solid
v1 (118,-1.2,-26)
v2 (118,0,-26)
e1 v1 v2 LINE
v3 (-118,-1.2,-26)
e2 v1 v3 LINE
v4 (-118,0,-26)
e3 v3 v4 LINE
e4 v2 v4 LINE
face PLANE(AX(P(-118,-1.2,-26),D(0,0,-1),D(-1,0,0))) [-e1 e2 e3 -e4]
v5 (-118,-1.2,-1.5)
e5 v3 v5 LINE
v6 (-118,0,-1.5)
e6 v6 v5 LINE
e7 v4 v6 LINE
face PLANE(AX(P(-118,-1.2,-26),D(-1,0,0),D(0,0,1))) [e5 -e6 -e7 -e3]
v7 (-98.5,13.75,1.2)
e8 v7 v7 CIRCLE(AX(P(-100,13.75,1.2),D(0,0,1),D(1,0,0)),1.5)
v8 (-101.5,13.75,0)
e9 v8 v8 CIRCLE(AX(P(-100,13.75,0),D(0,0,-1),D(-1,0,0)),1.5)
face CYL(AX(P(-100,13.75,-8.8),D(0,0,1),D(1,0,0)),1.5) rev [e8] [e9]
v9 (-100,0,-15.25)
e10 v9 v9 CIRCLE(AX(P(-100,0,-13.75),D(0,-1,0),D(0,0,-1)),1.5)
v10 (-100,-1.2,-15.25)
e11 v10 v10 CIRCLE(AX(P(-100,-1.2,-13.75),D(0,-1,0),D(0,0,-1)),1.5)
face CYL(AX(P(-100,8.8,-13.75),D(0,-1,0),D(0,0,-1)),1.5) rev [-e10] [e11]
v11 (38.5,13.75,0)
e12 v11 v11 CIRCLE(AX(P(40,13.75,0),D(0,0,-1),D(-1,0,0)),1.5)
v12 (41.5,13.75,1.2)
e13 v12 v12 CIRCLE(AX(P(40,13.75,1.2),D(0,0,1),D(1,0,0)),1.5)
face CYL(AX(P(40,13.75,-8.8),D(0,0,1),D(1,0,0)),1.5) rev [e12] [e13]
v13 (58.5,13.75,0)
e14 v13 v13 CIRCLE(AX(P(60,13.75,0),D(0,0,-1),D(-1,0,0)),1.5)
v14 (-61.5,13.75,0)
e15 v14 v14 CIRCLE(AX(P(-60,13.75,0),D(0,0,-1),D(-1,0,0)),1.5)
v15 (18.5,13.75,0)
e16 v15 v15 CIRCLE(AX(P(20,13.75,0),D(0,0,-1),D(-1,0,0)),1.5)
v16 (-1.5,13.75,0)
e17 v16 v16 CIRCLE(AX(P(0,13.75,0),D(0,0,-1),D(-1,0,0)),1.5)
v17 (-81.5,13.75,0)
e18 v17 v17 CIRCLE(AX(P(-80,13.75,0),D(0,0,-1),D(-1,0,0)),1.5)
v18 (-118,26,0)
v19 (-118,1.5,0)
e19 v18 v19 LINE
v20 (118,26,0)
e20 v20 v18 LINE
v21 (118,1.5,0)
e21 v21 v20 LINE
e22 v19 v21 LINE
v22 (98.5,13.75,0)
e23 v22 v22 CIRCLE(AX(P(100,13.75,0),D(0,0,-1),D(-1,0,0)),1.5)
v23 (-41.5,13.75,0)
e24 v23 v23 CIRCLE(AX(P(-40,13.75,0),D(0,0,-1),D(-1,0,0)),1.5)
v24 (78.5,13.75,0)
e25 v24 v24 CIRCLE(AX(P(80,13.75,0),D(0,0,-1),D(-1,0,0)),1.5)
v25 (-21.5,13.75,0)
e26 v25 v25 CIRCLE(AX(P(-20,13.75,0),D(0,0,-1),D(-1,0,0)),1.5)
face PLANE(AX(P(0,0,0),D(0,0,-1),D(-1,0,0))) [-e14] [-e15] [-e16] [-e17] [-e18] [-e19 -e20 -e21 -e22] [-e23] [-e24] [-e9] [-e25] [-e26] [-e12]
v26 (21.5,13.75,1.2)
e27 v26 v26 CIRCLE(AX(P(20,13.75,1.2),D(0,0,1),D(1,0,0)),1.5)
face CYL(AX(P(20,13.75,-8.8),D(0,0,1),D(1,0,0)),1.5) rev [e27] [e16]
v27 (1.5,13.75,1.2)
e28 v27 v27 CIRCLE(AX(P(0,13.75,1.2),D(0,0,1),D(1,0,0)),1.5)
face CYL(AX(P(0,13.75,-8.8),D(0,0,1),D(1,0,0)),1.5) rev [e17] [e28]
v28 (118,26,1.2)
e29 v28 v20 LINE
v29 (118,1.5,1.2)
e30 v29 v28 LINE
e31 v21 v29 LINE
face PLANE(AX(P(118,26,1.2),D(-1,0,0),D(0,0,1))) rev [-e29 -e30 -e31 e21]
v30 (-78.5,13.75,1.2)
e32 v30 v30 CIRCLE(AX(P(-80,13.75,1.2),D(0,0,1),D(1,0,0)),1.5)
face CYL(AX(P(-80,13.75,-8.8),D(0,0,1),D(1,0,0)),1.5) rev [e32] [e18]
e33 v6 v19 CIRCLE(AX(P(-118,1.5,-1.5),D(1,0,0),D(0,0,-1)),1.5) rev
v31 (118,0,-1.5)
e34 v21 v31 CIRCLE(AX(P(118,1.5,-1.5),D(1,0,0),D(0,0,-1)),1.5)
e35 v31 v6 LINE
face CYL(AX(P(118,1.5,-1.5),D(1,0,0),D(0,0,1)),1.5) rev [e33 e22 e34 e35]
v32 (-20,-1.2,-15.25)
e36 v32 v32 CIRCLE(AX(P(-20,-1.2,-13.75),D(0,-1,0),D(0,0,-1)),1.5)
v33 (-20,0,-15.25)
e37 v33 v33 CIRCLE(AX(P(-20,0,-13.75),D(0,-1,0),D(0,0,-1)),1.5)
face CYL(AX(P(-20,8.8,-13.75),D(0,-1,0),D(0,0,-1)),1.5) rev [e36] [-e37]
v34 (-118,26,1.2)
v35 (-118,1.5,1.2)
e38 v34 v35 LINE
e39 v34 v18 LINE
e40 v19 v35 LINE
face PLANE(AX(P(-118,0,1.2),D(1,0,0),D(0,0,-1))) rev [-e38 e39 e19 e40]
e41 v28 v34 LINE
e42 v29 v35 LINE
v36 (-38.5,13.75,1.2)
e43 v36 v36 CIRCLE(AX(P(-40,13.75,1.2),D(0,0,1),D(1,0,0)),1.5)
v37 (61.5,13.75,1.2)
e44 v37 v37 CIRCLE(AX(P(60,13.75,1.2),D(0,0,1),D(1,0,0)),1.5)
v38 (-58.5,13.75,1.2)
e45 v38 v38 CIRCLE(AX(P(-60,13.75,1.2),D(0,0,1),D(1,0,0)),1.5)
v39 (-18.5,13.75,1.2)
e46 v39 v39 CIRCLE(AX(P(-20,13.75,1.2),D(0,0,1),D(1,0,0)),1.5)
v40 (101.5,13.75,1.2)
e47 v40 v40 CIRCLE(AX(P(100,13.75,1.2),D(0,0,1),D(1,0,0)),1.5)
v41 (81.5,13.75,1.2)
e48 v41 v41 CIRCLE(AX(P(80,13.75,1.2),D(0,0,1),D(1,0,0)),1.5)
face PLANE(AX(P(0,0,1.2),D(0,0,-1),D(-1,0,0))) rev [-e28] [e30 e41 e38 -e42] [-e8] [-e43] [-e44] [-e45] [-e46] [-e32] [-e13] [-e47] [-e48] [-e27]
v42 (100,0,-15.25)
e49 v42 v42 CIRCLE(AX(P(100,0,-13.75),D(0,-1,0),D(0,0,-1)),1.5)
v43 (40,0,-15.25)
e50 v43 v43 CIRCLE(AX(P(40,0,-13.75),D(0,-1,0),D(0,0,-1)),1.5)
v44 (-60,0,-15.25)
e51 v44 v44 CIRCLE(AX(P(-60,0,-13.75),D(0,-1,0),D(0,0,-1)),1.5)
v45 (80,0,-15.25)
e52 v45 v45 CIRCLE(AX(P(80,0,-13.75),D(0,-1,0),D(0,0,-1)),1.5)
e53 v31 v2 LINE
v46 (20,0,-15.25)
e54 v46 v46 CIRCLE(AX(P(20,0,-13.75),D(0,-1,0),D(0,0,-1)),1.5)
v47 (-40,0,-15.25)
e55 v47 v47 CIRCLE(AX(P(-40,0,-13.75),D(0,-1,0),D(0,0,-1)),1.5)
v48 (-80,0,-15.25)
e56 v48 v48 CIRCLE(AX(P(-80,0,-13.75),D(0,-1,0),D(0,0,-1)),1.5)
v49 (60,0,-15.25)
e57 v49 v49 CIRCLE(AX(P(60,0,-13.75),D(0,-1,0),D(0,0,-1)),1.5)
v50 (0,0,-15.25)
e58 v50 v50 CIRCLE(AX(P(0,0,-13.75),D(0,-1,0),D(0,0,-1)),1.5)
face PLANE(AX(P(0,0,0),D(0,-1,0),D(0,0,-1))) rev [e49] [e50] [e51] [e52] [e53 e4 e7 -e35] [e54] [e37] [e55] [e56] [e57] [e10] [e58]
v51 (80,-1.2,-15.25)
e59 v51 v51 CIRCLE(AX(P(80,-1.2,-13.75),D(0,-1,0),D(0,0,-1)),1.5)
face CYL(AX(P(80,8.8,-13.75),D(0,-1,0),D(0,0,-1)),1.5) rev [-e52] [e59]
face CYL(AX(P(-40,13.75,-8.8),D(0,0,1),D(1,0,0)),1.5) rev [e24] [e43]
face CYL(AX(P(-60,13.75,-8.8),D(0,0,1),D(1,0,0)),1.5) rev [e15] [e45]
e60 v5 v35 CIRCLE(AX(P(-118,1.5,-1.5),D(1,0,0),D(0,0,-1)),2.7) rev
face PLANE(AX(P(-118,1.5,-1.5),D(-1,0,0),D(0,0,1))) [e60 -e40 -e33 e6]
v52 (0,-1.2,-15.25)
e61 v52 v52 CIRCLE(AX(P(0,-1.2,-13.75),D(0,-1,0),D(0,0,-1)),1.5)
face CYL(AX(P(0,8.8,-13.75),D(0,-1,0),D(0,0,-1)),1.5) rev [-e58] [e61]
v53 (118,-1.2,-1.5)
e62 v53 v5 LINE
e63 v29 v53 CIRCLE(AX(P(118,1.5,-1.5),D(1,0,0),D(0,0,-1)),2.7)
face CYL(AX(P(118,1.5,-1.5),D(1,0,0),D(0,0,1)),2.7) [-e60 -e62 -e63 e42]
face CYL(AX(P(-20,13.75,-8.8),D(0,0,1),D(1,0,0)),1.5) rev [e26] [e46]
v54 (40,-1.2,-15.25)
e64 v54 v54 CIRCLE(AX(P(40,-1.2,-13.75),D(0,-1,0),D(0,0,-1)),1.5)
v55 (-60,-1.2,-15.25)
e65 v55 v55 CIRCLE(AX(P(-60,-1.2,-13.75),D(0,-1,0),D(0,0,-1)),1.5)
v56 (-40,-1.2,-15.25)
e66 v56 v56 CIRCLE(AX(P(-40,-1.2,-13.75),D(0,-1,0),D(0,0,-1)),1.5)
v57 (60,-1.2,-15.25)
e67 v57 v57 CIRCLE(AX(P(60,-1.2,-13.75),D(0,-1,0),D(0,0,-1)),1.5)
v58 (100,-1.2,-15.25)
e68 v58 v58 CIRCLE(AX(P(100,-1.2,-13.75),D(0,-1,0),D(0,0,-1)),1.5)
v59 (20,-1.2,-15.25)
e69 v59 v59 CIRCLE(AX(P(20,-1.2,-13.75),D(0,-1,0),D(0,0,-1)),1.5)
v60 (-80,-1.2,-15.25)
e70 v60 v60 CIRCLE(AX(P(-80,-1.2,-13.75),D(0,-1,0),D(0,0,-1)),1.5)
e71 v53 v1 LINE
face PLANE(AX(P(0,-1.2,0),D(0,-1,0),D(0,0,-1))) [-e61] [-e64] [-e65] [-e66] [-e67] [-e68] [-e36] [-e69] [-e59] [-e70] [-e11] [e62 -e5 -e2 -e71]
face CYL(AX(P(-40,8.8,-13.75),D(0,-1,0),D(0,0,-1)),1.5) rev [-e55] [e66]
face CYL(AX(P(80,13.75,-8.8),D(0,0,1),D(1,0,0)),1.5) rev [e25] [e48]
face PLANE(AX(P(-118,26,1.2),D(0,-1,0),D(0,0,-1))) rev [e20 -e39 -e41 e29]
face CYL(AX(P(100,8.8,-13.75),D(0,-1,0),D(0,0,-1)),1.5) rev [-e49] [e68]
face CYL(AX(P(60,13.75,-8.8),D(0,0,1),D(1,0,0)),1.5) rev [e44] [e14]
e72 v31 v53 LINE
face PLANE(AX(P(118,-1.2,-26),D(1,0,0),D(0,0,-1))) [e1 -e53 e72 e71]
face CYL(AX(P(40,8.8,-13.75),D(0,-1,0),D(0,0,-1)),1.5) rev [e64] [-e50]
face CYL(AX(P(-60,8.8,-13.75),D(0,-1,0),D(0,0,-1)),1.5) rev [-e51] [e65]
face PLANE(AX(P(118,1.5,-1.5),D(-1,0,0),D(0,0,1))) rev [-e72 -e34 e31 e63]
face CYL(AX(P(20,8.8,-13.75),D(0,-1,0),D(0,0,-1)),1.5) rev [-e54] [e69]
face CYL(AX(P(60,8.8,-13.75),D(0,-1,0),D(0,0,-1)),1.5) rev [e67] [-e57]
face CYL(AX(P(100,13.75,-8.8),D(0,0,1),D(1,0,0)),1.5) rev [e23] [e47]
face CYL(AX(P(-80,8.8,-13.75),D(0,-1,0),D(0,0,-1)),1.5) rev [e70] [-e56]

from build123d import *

# Parameters (mm, degrees)
SKETCH1_W                    = 236
SKETCH1_H                    = 26
BASE_FLANGE1_DEPTH           = 1.2
EDGE_FLANGE1_STRIP_W         = 7.8
EDGE_FLANGE1_STRIP_H         = 1.2
EDGE_FLANGE1_STRIP_CUT_DEPTH = 236
EDGE_FLANGE1_DEPTH           = 236
SKETCH9_R                    = 1.5
CUT_EXTRUDE1_DEPTH           = 10
SKETCH10_R                   = 1.5
CUT_EXTRUDE2_DEPTH           = 10


# Sheet-metal steps are written as plain solids
with BuildPart() as part:
    # Sketch1 → Base-Flange1 (new body)
    with BuildSketch(Plane(origin=(0, 0, 0), x_dir=(1, 0, 0), z_dir=(0, 1, 0))):
        with Locations((0, 13)):
            Rectangle(SKETCH1_W, SKETCH1_H)
    extrude(amount=-BASE_FLANGE1_DEPTH)

    # Edge-Flange1 strip (across the edge) → Edge-Flange1 strip cut (cut)
    with BuildSketch(Plane(origin=(-118, 0, 0), x_dir=(0, 0, -1), z_dir=(1, 0, 0))):
        with Locations((-2.4, -0.6)):
            Rectangle(EDGE_FLANGE1_STRIP_W, EDGE_FLANGE1_STRIP_H)
    extrude(amount=EDGE_FLANGE1_STRIP_CUT_DEPTH, mode=Mode.SUBTRACT)

    # Edge-Flange1 section (across the edge) → Edge-Flange1 (add)
    with BuildSketch(Plane(origin=(-118, 0, 0), x_dir=(0, 0, -1), z_dir=(1, 0, 0))):
        with BuildLine():
            Line((-1.2, 1.5), (-1.2, 26))
            Line((-1.2, 26), (0, 26))
            Line((0, 26), (0, 1.5))
            ThreePointArc((0, 1.5), (0.439339828, 0.439339828), (1.5, 0))
            Line((1.5, 0), (1.5, -1.2))
            ThreePointArc((1.5, -1.2), (-0.409188309, -0.409188309), (-1.2, 1.5))
        make_face()
    extrude(amount=EDGE_FLANGE1_DEPTH)

    # Sketch9 → Cut-Extrude1 (cut)
    with BuildSketch(Plane.XZ.offset(1.2)):
        with Locations(Location((-100, -13.75, 0), (0, 0, 270))):
            Circle(SKETCH9_R)
        with Locations(Location((-80, -13.75, 0), (0, 0, 270))):
            Circle(SKETCH9_R)
        with Locations(Location((-60, -13.75, 0), (0, 0, 270))):
            Circle(SKETCH9_R)
        with Locations(Location((-40, -13.75, 0), (0, 0, 270))):
            Circle(SKETCH9_R)
        with Locations(Location((-20, -13.75, 0), (0, 0, 270))):
            Circle(SKETCH9_R)
        with Locations(Location((0, -13.75, 0), (0, 0, 270))):
            Circle(SKETCH9_R)
        with Locations(Location((20, -13.75, 0), (0, 0, 270))):
            Circle(SKETCH9_R)
        with Locations(Location((40, -13.75, 0), (0, 0, 270))):
            Circle(SKETCH9_R)
        with Locations(Location((60, -13.75, 0), (0, 0, 270))):
            Circle(SKETCH9_R)
        with Locations(Location((80, -13.75, 0), (0, 0, 270))):
            Circle(SKETCH9_R)
        with Locations(Location((100, -13.75, 0), (0, 0, 270))):
            Circle(SKETCH9_R)
    extrude(amount=-CUT_EXTRUDE1_DEPTH, mode=Mode.SUBTRACT)

    # Sketch10 → Cut-Extrude2 (cut)
    with BuildSketch(Plane.XY.offset(1.2)):
        with Locations((-100, 13.75)):
            Circle(SKETCH10_R)
        with Locations((-80, 13.75)):
            Circle(SKETCH10_R)
        with Locations((-60, 13.75)):
            Circle(SKETCH10_R)
        with Locations((-40, 13.75)):
            Circle(SKETCH10_R)
        with Locations((-20, 13.75)):
            Circle(SKETCH10_R)
        with Locations((0, 13.75)):
            Circle(SKETCH10_R)
        with Locations((20, 13.75)):
            Circle(SKETCH10_R)
        with Locations((40, 13.75)):
            Circle(SKETCH10_R)
        with Locations((60, 13.75)):
            Circle(SKETCH10_R)
        with Locations((80, 13.75)):
            Circle(SKETCH10_R)
        with Locations((100, 13.75)):
            Circle(SKETCH10_R)
    extrude(amount=-CUT_EXTRUDE2_DEPTH, mode=Mode.SUBTRACT)


solid = part.part
